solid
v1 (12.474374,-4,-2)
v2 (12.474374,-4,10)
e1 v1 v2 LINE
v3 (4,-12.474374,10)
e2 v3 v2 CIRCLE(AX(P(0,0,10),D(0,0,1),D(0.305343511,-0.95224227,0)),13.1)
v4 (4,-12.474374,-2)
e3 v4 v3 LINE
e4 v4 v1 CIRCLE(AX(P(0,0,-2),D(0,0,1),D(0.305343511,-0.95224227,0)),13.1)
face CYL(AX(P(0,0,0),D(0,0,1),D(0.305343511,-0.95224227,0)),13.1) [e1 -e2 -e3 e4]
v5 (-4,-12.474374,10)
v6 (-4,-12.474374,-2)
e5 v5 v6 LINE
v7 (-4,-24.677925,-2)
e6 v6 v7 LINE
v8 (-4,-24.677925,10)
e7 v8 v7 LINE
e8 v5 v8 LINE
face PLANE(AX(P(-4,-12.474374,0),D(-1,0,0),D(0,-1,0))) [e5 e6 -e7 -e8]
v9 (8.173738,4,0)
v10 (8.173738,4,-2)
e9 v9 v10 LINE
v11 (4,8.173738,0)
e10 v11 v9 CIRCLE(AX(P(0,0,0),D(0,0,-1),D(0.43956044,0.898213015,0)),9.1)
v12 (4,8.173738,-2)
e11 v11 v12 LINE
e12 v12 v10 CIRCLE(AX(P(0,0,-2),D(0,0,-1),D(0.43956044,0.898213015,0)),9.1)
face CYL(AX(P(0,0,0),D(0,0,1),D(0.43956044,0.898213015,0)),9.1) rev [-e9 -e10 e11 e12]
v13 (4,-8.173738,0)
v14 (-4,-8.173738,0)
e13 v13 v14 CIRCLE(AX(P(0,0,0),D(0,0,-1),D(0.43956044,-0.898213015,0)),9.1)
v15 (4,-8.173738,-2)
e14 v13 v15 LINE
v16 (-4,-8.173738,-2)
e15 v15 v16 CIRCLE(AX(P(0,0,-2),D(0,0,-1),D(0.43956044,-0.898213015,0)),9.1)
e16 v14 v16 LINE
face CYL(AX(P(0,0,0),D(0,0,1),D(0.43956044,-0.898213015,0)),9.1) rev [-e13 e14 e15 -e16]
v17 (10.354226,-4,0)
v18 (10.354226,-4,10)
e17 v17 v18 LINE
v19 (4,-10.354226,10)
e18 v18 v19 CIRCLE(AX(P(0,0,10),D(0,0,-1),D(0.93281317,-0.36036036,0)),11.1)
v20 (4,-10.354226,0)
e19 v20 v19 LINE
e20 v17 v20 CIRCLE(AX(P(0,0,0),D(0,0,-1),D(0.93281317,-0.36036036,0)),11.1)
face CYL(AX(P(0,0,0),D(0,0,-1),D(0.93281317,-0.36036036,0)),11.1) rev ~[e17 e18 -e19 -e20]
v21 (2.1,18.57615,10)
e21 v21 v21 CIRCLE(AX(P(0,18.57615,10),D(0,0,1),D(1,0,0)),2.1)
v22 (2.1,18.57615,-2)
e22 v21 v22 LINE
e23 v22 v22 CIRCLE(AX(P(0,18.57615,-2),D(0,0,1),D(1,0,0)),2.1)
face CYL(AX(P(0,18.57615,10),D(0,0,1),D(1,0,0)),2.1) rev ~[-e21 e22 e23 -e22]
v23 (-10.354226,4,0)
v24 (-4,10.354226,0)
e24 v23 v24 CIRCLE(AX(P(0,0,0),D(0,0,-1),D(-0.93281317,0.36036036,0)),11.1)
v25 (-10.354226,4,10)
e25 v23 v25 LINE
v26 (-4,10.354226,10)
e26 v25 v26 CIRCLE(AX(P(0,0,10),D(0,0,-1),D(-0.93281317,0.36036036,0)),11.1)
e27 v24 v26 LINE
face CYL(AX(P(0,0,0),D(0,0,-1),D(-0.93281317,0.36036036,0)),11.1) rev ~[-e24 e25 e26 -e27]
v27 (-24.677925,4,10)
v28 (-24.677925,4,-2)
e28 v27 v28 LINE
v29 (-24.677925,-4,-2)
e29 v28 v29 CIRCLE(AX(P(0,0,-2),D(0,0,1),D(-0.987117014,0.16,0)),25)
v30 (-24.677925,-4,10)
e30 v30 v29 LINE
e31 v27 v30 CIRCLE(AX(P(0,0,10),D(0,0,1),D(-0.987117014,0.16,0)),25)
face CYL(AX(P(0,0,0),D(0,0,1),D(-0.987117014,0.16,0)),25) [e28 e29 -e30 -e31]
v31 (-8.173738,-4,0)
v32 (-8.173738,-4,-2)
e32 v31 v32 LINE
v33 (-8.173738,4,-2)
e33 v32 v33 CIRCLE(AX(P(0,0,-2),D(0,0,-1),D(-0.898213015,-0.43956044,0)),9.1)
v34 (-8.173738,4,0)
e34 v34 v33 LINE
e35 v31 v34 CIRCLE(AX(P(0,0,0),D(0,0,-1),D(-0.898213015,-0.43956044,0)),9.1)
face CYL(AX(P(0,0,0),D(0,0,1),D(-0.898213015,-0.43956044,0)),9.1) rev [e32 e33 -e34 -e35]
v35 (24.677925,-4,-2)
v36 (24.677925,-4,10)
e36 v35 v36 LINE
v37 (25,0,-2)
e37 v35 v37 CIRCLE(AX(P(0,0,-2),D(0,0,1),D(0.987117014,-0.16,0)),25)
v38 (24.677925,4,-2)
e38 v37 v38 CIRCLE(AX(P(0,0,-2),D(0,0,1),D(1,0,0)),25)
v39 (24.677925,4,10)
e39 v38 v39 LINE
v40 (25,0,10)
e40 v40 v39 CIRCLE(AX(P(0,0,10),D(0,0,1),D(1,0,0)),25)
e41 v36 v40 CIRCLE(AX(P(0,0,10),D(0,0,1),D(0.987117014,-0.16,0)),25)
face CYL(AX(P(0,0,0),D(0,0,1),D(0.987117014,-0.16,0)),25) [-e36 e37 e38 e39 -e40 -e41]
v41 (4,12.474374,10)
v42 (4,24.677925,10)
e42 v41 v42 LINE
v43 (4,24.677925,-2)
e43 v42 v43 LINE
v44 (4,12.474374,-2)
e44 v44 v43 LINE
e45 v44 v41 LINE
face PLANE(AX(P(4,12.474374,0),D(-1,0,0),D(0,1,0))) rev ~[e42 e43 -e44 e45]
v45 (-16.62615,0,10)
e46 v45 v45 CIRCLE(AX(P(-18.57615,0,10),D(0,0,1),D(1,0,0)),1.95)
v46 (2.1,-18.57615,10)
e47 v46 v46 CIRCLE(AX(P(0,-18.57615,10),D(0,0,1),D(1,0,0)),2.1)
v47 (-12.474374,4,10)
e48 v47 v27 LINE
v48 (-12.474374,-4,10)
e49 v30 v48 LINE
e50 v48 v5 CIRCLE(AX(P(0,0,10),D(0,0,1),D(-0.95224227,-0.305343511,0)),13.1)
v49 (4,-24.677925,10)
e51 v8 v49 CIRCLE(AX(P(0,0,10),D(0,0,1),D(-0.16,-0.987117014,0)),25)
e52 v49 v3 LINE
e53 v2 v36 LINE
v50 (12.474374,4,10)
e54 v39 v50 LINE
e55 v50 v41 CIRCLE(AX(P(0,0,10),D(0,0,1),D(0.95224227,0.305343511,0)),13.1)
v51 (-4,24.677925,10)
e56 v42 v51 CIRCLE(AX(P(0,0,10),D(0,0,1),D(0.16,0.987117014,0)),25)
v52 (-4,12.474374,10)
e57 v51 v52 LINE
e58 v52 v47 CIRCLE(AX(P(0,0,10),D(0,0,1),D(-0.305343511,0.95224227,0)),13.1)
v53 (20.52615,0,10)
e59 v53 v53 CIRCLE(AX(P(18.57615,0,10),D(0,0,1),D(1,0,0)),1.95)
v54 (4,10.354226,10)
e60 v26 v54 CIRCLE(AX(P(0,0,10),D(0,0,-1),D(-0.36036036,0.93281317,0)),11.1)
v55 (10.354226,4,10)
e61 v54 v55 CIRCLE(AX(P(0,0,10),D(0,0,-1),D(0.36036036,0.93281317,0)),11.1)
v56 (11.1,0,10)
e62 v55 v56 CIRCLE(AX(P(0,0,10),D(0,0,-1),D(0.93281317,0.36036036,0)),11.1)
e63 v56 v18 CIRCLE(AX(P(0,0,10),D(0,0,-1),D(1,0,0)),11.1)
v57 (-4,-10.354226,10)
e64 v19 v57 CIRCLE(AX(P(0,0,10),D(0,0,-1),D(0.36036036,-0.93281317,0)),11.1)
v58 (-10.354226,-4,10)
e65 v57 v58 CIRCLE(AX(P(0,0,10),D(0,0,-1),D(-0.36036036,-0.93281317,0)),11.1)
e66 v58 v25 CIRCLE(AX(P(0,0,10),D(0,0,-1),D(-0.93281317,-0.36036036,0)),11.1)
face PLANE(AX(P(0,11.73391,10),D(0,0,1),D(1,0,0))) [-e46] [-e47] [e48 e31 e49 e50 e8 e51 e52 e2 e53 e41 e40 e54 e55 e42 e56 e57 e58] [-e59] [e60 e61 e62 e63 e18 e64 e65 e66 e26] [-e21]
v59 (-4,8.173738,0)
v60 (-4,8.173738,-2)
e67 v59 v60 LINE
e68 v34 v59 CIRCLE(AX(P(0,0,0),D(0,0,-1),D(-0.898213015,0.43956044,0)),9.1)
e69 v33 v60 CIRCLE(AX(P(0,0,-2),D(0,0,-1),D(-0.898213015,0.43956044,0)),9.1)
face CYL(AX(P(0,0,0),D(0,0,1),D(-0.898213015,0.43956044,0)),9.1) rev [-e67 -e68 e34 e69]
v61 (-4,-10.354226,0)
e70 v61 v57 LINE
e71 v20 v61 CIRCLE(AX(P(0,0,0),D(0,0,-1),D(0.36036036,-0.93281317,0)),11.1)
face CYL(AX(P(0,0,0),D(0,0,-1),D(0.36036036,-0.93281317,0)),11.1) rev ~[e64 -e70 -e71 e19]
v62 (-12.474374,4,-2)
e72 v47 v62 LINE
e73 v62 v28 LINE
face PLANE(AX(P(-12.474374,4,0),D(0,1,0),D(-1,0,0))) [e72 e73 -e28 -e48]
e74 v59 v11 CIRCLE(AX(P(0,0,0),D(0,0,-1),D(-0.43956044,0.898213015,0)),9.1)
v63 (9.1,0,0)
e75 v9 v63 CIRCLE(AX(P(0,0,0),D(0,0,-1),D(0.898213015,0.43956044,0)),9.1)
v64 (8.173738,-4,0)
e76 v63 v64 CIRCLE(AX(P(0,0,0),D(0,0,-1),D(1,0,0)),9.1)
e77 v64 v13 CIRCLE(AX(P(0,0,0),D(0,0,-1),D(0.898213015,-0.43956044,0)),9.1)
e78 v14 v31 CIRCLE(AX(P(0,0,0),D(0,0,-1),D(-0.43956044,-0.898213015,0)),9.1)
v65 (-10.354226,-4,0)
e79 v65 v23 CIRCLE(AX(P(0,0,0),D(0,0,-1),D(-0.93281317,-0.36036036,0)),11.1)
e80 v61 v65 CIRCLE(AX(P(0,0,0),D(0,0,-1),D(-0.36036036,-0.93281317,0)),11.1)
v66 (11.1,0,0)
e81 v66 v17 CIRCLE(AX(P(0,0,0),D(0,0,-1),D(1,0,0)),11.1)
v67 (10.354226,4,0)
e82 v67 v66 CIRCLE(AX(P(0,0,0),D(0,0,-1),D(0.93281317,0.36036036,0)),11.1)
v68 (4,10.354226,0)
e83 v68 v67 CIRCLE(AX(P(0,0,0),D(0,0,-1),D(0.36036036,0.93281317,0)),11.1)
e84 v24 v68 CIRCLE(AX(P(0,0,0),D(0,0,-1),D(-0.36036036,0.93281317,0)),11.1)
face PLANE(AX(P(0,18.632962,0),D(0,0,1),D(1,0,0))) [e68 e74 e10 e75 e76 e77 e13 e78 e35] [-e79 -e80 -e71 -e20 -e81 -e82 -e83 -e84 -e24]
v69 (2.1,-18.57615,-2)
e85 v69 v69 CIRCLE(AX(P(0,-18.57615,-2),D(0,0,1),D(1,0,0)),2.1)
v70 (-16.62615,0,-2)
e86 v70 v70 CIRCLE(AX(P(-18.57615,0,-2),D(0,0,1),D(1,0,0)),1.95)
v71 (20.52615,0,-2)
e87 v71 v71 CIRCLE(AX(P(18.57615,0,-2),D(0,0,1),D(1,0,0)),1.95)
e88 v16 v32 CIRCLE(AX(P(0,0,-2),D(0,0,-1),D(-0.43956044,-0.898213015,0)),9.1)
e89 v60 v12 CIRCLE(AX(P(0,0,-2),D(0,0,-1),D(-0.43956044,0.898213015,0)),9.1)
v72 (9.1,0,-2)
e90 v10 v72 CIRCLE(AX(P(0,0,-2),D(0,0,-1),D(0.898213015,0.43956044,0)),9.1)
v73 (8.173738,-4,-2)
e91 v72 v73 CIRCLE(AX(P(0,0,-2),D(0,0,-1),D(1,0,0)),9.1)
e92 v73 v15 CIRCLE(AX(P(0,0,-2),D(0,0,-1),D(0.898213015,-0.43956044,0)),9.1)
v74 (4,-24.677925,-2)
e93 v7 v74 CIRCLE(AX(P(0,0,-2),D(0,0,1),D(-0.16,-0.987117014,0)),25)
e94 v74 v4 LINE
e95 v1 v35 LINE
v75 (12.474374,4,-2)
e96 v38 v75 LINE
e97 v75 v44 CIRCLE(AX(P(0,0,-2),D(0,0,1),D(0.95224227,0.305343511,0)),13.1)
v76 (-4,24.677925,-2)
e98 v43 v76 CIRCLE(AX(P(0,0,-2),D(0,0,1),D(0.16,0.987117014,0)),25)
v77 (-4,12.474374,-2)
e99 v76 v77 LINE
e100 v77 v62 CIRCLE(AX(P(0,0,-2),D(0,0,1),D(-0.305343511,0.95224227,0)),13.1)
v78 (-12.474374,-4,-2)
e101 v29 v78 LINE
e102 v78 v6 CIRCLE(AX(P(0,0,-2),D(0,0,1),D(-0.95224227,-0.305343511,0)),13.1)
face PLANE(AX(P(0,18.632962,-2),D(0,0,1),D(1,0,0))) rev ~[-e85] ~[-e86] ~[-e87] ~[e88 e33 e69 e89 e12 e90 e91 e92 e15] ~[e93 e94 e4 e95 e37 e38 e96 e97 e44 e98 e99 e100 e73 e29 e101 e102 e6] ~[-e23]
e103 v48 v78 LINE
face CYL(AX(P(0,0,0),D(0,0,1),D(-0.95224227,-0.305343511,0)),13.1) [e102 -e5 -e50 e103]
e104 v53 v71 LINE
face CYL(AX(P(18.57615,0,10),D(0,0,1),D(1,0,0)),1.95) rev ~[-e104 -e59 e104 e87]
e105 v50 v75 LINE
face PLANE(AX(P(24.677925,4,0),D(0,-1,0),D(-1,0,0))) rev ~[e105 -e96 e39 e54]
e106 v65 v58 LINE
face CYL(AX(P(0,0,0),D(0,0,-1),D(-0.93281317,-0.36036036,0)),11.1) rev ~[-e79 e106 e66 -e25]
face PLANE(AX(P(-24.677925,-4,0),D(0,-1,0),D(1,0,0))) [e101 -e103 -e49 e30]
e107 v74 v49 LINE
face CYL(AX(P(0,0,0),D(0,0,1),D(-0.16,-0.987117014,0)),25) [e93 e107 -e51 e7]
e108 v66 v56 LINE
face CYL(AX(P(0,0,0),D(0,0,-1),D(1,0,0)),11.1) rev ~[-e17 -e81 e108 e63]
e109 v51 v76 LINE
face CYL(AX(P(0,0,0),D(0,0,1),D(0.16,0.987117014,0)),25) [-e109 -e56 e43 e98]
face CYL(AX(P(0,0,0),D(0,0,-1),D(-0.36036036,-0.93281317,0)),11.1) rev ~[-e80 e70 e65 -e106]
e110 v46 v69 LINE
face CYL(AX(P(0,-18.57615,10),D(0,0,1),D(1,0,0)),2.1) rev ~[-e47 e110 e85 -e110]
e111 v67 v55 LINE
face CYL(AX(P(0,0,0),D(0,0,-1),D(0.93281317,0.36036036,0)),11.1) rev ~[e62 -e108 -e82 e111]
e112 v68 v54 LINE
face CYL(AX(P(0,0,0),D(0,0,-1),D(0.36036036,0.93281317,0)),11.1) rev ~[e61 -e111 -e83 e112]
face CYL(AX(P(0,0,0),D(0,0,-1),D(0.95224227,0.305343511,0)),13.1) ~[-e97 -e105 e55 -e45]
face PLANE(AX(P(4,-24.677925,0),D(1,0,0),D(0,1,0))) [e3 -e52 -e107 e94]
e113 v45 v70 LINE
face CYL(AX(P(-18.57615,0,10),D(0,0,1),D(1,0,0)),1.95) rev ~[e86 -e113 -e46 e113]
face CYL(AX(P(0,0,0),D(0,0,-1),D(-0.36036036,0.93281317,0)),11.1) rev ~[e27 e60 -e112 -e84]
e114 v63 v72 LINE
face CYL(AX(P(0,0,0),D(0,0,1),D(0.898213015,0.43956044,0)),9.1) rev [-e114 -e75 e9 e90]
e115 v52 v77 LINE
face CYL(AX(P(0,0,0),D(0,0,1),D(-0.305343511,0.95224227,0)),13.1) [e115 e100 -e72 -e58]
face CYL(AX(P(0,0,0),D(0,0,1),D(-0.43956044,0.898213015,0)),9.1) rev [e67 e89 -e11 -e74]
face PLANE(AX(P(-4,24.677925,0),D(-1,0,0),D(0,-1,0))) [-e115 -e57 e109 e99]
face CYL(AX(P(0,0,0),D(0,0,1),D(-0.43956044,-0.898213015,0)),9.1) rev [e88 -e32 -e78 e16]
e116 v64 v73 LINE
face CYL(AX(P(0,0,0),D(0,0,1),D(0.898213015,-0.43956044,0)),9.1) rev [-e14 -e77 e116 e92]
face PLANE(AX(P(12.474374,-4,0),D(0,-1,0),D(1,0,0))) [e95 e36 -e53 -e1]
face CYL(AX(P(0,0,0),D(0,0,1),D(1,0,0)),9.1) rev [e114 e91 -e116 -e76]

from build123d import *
from build123d import SkipClean  # not in build123d's __all__

# Parameters (mm, degrees)
F1_DEPTH = 2
F2_DEPTH = 10
F3_R     = 1.95
F3_R_2   = 2.1
F4_DEPTH = 12.001


# Not quite as in the source:
# - after a boolean that leaves OpenCascade's solid faulty, fix() repairs it


with BuildPart() as f1:
    # F0 (on Top) → F1 (new body)
    with BuildSketch(Plane.XY):
        with BuildLine():
            ThreePointArc((-4, 12.4743737318), (0, 13.1), (4, 12.4743737318))
            Line((4, 12.4743737318), (4, 24.6779253585))
            Line((4, 24.6779253585), (-4, 24.6779253585))
            Line((-4, 24.6779253585), (-4, 12.4743737318))
        make_face()
        with BuildLine():
            Line((-4, 24.6779253585), (4, 24.6779253585))
            ThreePointArc((4, 24.6779253585), (0, 25), (-4, 24.6779253585))
        make_face()
        with BuildLine():
            ThreePointArc((25, 0), (24.9193512552, 2.0064727804), (24.6779253585, 4))
            Line((24.6779253585, 4), (24.6779253585, -4))
            ThreePointArc((24.6779253585, -4), (24.9193512552, -2.0064727804), (25, 0))
        make_face()
        with BuildLine():
            Line((24.6779253585, 4), (12.4743737318, 4))
            ThreePointArc((12.4743737318, 4), (12.942648413, 2.0243152069), (13.1, 0))
            ThreePointArc((13.1, 0), (12.942648413, -2.0243152069), (12.4743737318, -4))
            Line((12.4743737318, -4), (24.6779253585, -4))
            Line((24.6779253585, -4), (24.6779253585, 4))
        make_face()
        with BuildLine():
            ThreePointArc((-4, -24.6779253585), (0, -25), (4, -24.6779253585))
            Line((4, -24.6779253585), (-4, -24.6779253585))
        make_face()
        with BuildLine():
            Line((-24.6779253585, -4), (-24.6779253585, 4))
            ThreePointArc((-24.6779253585, 4), (-25, 0), (-24.6779253585, -4))
        make_face()
        with BuildLine():
            ThreePointArc((-12.4743737318, -4), (-13.1, 0), (-12.4743737318, 4))
            Line((-12.4743737318, 4), (-24.6779253585, 4))
            Line((-24.6779253585, 4), (-24.6779253585, -4))
            Line((-24.6779253585, -4), (-12.4743737318, -4))
        make_face()
        with BuildLine():
            Line((4, -24.6779253585), (4, -12.4743737318))
            ThreePointArc((4, -12.4743737318), (0, -13.1), (-4, -12.4743737318))
            Line((-4, -12.4743737318), (-4, -24.6779253585))
            Line((-4, -24.6779253585), (4, -24.6779253585))
        make_face()
        with BuildLine():
            Line((-4, -12.4743737318), (-4, -10.3542261903))
            ThreePointArc((-4, -10.3542261903), (-7.8488852712, -7.8488852712), (-10.3542261903, -4))
            Line((-10.3542261903, -4), (-12.4743737318, -4))
            ThreePointArc((-12.4743737318, -4), (-9.2630988335, -9.2630988335), (-4, -12.4743737318))
        make_face()
        with BuildLine():
            ThreePointArc((-10.3542261903, -4), (-7.8488852712, -7.8488852712), (-4, -10.3542261903))
            Line((-4, -10.3542261903), (-4, -8.1737384348))
            ThreePointArc((-4, -8.1737384348), (-6.4346717088, -6.4346717088), (-8.1737384348, -4))
            Line((-8.1737384348, -4), (-10.3542261903, -4))
        make_face()
        with BuildLine():
            Line((-8.1737384348, 4), (-10.3542261903, 4))
            ThreePointArc((-10.3542261903, 4), (-11.1, 0), (-10.3542261903, -4))
            Line((-10.3542261903, -4), (-8.1737384348, -4))
            ThreePointArc((-8.1737384348, -4), (-9.1, 0), (-8.1737384348, 4))
        make_face()
        with BuildLine():
            ThreePointArc((-10.3542261903, -4), (-11.1, 0), (-10.3542261903, 4))
            Line((-10.3542261903, 4), (-12.4743737318, 4))
            ThreePointArc((-12.4743737318, 4), (-13.1, 0), (-12.4743737318, -4))
            Line((-12.4743737318, -4), (-10.3542261903, -4))
        make_face()
        with BuildLine():
            ThreePointArc((-10.3542261903, 4), (-7.8488852712, 7.8488852712), (-4, 10.3542261903))
            Line((-4, 10.3542261903), (-4, 12.4743737318))
            ThreePointArc((-4, 12.4743737318), (-9.2630988335, 9.2630988335), (-12.4743737318, 4))
            Line((-12.4743737318, 4), (-10.3542261903, 4))
        make_face()
        with BuildLine():
            Line((-4, 8.1737384348), (-4, 10.3542261903))
            ThreePointArc((-4, 10.3542261903), (-7.8488852712, 7.8488852712), (-10.3542261903, 4))
            Line((-10.3542261903, 4), (-8.1737384348, 4))
            ThreePointArc((-8.1737384348, 4), (-6.4346717088, 6.4346717088), (-4, 8.1737384348))
        make_face()
        with BuildLine():
            Line((4, 8.1737384348), (4, 10.3542261903))
            ThreePointArc((4, 10.3542261903), (0, 11.1), (-4, 10.3542261903))
            Line((-4, 10.3542261903), (-4, 8.1737384348))
            ThreePointArc((-4, 8.1737384348), (0, 9.1), (4, 8.1737384348))
        make_face()
        with BuildLine():
            ThreePointArc((-4, 10.3542261903), (0, 11.1), (4, 10.3542261903))
            Line((4, 10.3542261903), (4, 12.4743737318))
            ThreePointArc((4, 12.4743737318), (0, 13.1), (-4, 12.4743737318))
            Line((-4, 12.4743737318), (-4, 10.3542261903))
        make_face()
        with BuildLine():
            ThreePointArc((4, 10.3542261903), (7.8488852712, 7.8488852712), (10.3542261903, 4))
            Line((10.3542261903, 4), (12.4743737318, 4))
            ThreePointArc((12.4743737318, 4), (9.2630988335, 9.2630988335), (4, 12.4743737318))
            Line((4, 12.4743737318), (4, 10.3542261903))
        make_face()
        with BuildLine():
            Line((8.1737384348, 4), (10.3542261903, 4))
            ThreePointArc((10.3542261903, 4), (7.8488852712, 7.8488852712), (4, 10.3542261903))
            Line((4, 10.3542261903), (4, 8.1737384348))
            ThreePointArc((4, 8.1737384348), (6.4346717088, 6.4346717088), (8.1737384348, 4))
        make_face()
        with BuildLine():
            ThreePointArc((10.3542261903, 4), (10.9119638634, 2.0344642154), (11.1, 0))
            ThreePointArc((11.1, 0), (10.9119638634, -2.0344642154), (10.3542261903, -4))
            Line((10.3542261903, -4), (12.4743737318, -4))
            ThreePointArc((12.4743737318, -4), (12.942648413, -2.0243152069), (13.1, 0))
            ThreePointArc((13.1, 0), (12.942648413, 2.0243152069), (12.4743737318, 4))
            Line((12.4743737318, 4), (10.3542261903, 4))
        make_face()
        with BuildLine():
            ThreePointArc((10.3542261903, -4), (10.9119638634, -2.0344642154), (11.1, 0))
            ThreePointArc((11.1, 0), (10.9119638634, 2.0344642154), (10.3542261903, 4))
            Line((10.3542261903, 4), (8.1737384348, 4))
            ThreePointArc((8.1737384348, 4), (8.8654108691, 2.052922337), (9.1, 0))
            ThreePointArc((9.1, 0), (8.8654108691, -2.052922337), (8.1737384348, -4))
            Line((8.1737384348, -4), (10.3542261903, -4))
        make_face()
        with BuildLine():
            Line((12.4743737318, -4), (10.3542261903, -4))
            ThreePointArc((10.3542261903, -4), (7.8488852712, -7.8488852712), (4, -10.3542261903))
            Line((4, -10.3542261903), (4, -12.4743737318))
            ThreePointArc((4, -12.4743737318), (9.2630988335, -9.2630988335), (12.4743737318, -4))
        make_face()
        with BuildLine():
            ThreePointArc((4, -10.3542261903), (7.8488852712, -7.8488852712), (10.3542261903, -4))
            Line((10.3542261903, -4), (8.1737384348, -4))
            ThreePointArc((8.1737384348, -4), (6.4346717088, -6.4346717088), (4, -8.1737384348))
            Line((4, -8.1737384348), (4, -10.3542261903))
        make_face()
        with BuildLine():
            ThreePointArc((-4, -10.3542261903), (0, -11.1), (4, -10.3542261903))
            Line((4, -10.3542261903), (4, -8.1737384348))
            ThreePointArc((4, -8.1737384348), (0, -9.1), (-4, -8.1737384348))
            Line((-4, -8.1737384348), (-4, -10.3542261903))
        make_face()
        with BuildLine():
            Line((4, -12.4743737318), (4, -10.3542261903))
            ThreePointArc((4, -10.3542261903), (0, -11.1), (-4, -10.3542261903))
            Line((-4, -10.3542261903), (-4, -12.4743737318))
            ThreePointArc((-4, -12.4743737318), (0, -13.1), (4, -12.4743737318))
        make_face()
    extrude(amount=-F1_DEPTH)

    # F0 (on Top) → F2 (join)
    with BuildSketch(Plane.XY):
        with BuildLine():
            ThreePointArc((-4, 10.3542261903), (0, 11.1), (4, 10.3542261903))
            Line((4, 10.3542261903), (4, 12.4743737318))
            ThreePointArc((4, 12.4743737318), (0, 13.1), (-4, 12.4743737318))
            Line((-4, 12.4743737318), (-4, 10.3542261903))
        make_face()
        with BuildLine():
            ThreePointArc((4, 10.3542261903), (7.8488852712, 7.8488852712), (10.3542261903, 4))
            Line((10.3542261903, 4), (12.4743737318, 4))
            ThreePointArc((12.4743737318, 4), (9.2630988335, 9.2630988335), (4, 12.4743737318))
            Line((4, 12.4743737318), (4, 10.3542261903))
        make_face()
        with BuildLine():
            ThreePointArc((-4, 12.4743737318), (0, 13.1), (4, 12.4743737318))
            Line((4, 12.4743737318), (4, 24.6779253585))
            Line((4, 24.6779253585), (-4, 24.6779253585))
            Line((-4, 24.6779253585), (-4, 12.4743737318))
        make_face()
        with BuildLine():
            ThreePointArc((-10.3542261903, 4), (-7.8488852712, 7.8488852712), (-4, 10.3542261903))
            Line((-4, 10.3542261903), (-4, 12.4743737318))
            ThreePointArc((-4, 12.4743737318), (-9.2630988335, 9.2630988335), (-12.4743737318, 4))
            Line((-12.4743737318, 4), (-10.3542261903, 4))
        make_face()
        with BuildLine():
            ThreePointArc((-10.3542261903, -4), (-11.1, 0), (-10.3542261903, 4))
            Line((-10.3542261903, 4), (-12.4743737318, 4))
            ThreePointArc((-12.4743737318, 4), (-13.1, 0), (-12.4743737318, -4))
            Line((-12.4743737318, -4), (-10.3542261903, -4))
        make_face()
        with BuildLine():
            ThreePointArc((-12.4743737318, -4), (-13.1, 0), (-12.4743737318, 4))
            Line((-12.4743737318, 4), (-24.6779253585, 4))
            Line((-24.6779253585, 4), (-24.6779253585, -4))
            Line((-24.6779253585, -4), (-12.4743737318, -4))
        make_face()
        with BuildLine():
            Line((-4, -12.4743737318), (-4, -10.3542261903))
            ThreePointArc((-4, -10.3542261903), (-7.8488852712, -7.8488852712), (-10.3542261903, -4))
            Line((-10.3542261903, -4), (-12.4743737318, -4))
            ThreePointArc((-12.4743737318, -4), (-9.2630988335, -9.2630988335), (-4, -12.4743737318))
        make_face()
        with BuildLine():
            Line((4, -12.4743737318), (4, -10.3542261903))
            ThreePointArc((4, -10.3542261903), (0, -11.1), (-4, -10.3542261903))
            Line((-4, -10.3542261903), (-4, -12.4743737318))
            ThreePointArc((-4, -12.4743737318), (0, -13.1), (4, -12.4743737318))
        make_face()
        with BuildLine():
            Line((4, -24.6779253585), (4, -12.4743737318))
            ThreePointArc((4, -12.4743737318), (0, -13.1), (-4, -12.4743737318))
            Line((-4, -12.4743737318), (-4, -24.6779253585))
            Line((-4, -24.6779253585), (4, -24.6779253585))
        make_face()
        with BuildLine():
            Line((12.4743737318, -4), (10.3542261903, -4))
            ThreePointArc((10.3542261903, -4), (7.8488852712, -7.8488852712), (4, -10.3542261903))
            Line((4, -10.3542261903), (4, -12.4743737318))
            ThreePointArc((4, -12.4743737318), (9.2630988335, -9.2630988335), (12.4743737318, -4))
        make_face()
        with BuildLine():
            ThreePointArc((10.3542261903, 4), (10.9119638634, 2.0344642154), (11.1, 0))
            ThreePointArc((11.1, 0), (10.9119638634, -2.0344642154), (10.3542261903, -4))
            Line((10.3542261903, -4), (12.4743737318, -4))
            ThreePointArc((12.4743737318, -4), (12.942648413, -2.0243152069), (13.1, 0))
            ThreePointArc((13.1, 0), (12.942648413, 2.0243152069), (12.4743737318, 4))
            Line((12.4743737318, 4), (10.3542261903, 4))
        make_face()
        with BuildLine():
            Line((24.6779253585, 4), (12.4743737318, 4))
            ThreePointArc((12.4743737318, 4), (12.942648413, 2.0243152069), (13.1, 0))
            ThreePointArc((13.1, 0), (12.942648413, -2.0243152069), (12.4743737318, -4))
            Line((12.4743737318, -4), (24.6779253585, -4))
            Line((24.6779253585, -4), (24.6779253585, 4))
        make_face()
        with BuildLine():
            ThreePointArc((25, 0), (24.9193512552, 2.0064727804), (24.6779253585, 4))
            Line((24.6779253585, 4), (24.6779253585, -4))
            ThreePointArc((24.6779253585, -4), (24.9193512552, -2.0064727804), (25, 0))
        make_face()
        with BuildLine():
            ThreePointArc((-4, -24.6779253585), (0, -25), (4, -24.6779253585))
            Line((4, -24.6779253585), (-4, -24.6779253585))
        make_face()
        with BuildLine():
            Line((-24.6779253585, -4), (-24.6779253585, 4))
            ThreePointArc((-24.6779253585, 4), (-25, 0), (-24.6779253585, -4))
        make_face()
        with BuildLine():
            Line((-4, 24.6779253585), (4, 24.6779253585))
            ThreePointArc((4, 24.6779253585), (0, 25), (-4, 24.6779253585))
        make_face()
    with SkipClean():  # cleaning this boolean's faces spoils the solid; the shape is the same uncleaned
        extrude(amount=F2_DEPTH)

    # F3 (on face) → F4 (cut, through all)
    with BuildSketch(Plane.XY.offset(10)):
        with Locations((18.5761495451, 0)):
            Circle(F3_R)
        with Locations((0, 18.5761495451)):
            Circle(F3_R_2)
        with Locations((0, -18.5761495451)):
            Circle(F3_R_2)
        with Locations((-18.5761495451, 0)):
            Circle(F3_R)
    extrude(amount=-F4_DEPTH, mode=Mode.SUBTRACT)

    add(f1.part.fix(), mode=Mode.REPLACE)


solid = f1.part
